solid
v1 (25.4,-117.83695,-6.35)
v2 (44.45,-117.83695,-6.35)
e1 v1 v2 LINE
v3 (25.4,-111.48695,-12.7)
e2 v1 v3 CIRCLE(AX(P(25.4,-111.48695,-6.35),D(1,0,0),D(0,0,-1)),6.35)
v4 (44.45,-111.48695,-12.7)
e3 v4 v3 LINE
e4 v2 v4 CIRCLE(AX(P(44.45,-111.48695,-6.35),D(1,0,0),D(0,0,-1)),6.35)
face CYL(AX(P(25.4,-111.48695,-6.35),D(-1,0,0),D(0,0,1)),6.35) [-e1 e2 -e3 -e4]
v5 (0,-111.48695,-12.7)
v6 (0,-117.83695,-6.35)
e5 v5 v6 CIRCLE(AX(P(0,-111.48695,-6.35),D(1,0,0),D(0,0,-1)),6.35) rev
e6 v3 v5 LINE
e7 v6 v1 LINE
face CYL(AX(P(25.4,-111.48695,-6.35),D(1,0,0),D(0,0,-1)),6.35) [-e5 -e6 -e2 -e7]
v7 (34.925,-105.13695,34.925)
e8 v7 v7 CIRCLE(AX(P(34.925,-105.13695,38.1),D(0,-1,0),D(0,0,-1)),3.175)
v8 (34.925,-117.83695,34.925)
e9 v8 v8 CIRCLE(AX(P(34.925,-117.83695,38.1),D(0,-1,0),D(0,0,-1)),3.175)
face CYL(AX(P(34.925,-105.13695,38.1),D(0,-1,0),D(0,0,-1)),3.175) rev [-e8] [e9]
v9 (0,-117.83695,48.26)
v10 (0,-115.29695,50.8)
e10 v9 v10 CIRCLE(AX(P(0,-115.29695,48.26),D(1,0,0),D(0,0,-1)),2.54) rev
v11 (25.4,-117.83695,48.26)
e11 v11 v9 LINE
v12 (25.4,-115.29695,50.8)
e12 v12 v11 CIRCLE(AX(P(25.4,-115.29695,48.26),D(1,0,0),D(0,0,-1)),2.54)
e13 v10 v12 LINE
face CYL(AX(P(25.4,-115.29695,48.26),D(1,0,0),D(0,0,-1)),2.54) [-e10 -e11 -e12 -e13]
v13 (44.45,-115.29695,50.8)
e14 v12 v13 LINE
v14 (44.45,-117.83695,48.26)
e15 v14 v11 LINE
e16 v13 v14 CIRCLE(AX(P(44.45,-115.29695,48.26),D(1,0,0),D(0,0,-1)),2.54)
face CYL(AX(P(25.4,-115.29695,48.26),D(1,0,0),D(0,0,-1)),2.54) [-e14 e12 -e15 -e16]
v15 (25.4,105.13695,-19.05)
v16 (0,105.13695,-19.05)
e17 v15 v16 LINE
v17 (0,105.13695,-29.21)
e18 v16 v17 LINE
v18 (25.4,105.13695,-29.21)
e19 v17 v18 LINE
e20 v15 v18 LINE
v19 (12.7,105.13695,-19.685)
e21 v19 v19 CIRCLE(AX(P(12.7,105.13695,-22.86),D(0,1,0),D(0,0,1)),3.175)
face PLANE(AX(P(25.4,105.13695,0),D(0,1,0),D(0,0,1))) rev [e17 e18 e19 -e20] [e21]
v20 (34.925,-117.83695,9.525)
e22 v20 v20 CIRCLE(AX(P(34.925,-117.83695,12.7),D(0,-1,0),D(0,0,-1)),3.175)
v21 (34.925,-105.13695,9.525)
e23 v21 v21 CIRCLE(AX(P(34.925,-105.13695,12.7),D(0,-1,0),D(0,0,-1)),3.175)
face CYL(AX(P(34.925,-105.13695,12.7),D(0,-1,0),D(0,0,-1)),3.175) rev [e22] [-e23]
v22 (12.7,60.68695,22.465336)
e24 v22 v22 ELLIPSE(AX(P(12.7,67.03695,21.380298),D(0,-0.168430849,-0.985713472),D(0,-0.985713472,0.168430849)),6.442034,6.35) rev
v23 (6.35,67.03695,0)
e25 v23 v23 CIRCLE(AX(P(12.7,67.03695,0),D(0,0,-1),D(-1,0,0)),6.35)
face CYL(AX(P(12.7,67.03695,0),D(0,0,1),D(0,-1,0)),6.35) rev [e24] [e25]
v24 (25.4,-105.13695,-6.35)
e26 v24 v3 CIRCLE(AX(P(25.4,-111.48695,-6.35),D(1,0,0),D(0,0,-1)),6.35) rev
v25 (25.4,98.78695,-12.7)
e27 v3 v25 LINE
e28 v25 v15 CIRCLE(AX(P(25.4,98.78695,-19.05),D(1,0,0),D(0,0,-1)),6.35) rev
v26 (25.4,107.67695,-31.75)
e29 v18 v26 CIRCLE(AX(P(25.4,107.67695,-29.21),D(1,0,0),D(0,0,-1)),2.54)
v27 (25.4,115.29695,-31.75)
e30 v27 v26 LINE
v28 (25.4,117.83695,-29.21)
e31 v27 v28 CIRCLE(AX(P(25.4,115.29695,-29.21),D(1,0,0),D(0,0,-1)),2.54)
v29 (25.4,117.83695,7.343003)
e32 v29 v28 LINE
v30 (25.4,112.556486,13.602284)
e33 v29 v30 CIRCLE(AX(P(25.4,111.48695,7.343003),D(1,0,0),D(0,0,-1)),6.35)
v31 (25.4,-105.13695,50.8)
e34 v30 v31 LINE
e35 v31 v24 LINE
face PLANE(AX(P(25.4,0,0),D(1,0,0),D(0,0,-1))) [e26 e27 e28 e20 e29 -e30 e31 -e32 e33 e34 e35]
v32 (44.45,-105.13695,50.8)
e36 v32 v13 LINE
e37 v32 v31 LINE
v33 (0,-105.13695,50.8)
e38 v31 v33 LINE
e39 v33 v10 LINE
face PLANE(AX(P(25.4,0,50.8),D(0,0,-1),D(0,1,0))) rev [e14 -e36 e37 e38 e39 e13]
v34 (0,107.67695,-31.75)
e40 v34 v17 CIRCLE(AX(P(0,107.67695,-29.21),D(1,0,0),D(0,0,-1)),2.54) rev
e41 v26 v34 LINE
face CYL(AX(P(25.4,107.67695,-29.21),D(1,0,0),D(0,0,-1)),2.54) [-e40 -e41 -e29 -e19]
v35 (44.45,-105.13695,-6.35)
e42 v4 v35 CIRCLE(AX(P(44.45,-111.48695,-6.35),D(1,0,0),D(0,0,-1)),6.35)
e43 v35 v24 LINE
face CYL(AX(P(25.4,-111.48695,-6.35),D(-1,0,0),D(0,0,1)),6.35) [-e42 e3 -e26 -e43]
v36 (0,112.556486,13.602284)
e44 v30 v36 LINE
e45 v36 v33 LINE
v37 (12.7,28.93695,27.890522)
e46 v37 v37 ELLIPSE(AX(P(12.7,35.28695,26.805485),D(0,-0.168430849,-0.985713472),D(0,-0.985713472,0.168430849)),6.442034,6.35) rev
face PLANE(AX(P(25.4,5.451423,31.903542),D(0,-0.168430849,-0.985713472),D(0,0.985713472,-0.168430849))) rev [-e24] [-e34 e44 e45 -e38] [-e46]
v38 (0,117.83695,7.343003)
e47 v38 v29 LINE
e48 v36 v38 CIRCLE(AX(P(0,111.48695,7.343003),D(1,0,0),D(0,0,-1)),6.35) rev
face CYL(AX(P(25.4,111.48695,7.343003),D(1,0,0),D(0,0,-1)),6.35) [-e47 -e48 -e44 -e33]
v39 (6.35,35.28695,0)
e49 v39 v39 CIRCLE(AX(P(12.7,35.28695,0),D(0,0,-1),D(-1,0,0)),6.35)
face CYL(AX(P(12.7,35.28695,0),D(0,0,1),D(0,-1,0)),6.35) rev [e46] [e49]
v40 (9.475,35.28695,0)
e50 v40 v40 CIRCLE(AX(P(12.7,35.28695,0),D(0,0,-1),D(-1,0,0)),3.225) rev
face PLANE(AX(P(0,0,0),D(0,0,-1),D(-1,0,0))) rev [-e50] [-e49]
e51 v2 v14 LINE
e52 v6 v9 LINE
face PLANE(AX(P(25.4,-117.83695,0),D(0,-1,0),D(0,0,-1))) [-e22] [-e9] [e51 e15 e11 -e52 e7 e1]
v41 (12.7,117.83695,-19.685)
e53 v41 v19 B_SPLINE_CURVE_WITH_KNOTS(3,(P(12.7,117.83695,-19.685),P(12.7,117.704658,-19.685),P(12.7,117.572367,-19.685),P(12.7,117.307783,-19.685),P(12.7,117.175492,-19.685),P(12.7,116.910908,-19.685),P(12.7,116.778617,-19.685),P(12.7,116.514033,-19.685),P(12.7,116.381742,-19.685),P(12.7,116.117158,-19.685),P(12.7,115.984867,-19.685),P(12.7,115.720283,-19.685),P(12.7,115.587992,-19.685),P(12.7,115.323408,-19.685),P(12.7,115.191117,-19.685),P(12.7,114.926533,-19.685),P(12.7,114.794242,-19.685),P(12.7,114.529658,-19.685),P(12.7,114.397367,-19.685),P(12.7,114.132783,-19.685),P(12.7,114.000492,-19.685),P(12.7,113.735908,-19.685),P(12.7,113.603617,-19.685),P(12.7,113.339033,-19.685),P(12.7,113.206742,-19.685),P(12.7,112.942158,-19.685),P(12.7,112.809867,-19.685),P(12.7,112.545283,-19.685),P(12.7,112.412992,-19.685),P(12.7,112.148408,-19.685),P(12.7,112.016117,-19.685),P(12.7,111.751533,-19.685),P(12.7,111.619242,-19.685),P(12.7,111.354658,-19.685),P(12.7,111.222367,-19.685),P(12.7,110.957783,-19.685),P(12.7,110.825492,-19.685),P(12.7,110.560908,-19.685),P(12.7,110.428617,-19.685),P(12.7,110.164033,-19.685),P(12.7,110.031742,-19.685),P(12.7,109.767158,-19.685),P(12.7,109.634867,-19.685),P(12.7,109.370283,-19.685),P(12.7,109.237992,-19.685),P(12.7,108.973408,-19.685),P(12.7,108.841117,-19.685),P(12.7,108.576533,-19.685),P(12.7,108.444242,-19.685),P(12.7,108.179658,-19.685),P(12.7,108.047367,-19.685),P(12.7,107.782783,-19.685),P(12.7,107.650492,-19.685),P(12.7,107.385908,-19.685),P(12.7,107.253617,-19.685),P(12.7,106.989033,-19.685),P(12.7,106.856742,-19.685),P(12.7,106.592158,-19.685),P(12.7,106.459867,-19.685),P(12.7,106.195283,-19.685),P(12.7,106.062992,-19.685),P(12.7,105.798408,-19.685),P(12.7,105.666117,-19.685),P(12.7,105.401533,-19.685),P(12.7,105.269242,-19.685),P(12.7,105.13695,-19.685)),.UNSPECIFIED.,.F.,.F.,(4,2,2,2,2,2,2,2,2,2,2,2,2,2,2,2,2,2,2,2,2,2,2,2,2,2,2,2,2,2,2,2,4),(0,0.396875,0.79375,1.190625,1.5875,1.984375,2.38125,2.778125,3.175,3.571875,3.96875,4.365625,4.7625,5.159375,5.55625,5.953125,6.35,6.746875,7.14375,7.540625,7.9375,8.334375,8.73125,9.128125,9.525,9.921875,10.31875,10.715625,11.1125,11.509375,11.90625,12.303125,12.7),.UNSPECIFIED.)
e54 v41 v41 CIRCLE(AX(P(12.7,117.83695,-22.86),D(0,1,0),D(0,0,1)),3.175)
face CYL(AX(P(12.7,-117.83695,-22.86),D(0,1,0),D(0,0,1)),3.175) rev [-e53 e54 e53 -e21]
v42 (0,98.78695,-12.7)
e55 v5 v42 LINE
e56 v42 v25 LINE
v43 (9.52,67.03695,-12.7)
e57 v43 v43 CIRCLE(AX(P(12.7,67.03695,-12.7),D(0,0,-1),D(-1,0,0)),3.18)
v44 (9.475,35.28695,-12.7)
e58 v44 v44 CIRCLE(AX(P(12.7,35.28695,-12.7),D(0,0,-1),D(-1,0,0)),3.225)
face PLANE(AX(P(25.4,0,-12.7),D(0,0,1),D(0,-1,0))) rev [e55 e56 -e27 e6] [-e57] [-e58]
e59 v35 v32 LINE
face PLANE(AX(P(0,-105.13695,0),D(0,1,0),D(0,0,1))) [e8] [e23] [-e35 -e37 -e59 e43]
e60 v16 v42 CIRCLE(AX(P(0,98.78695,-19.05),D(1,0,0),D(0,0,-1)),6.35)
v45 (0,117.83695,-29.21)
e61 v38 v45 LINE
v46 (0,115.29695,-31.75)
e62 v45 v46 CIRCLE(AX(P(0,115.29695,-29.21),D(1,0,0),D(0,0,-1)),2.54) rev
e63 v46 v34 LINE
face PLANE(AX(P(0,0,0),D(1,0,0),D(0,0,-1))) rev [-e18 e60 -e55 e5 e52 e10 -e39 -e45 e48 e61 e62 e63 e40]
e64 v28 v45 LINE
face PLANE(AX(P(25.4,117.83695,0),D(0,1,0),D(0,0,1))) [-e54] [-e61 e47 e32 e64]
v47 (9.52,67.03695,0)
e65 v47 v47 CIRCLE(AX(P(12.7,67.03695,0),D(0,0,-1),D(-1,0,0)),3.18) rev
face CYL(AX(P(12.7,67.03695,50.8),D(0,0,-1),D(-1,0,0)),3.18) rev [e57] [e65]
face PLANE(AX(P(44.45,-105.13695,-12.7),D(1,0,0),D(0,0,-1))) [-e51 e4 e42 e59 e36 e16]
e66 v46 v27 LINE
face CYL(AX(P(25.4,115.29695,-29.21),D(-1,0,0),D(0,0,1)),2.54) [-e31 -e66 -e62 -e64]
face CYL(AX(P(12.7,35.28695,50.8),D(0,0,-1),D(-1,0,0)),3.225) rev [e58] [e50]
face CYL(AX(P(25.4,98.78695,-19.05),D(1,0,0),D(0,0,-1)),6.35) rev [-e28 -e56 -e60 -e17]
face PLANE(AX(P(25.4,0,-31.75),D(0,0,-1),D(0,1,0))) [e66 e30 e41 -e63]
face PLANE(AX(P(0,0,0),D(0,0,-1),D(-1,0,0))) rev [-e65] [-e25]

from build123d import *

# Parameters (mm, degrees)
SKETCH3_W           = 38.1
SKETCH3_H           = 12.7
SKETCH3_W_2         = 19.05
BOSS_EXTRUDE1_DEPTH = 25.4
FILLET1_R           = 6.35
FILLET3_R           = 2.54
SKETCH9_R           = 3.175
CUT_EXTRUDE2_DEPTH  = 243.42109467
SKETCH10_R          = 3.225000027
SKETCH10_R_2        = 3.180000003
CUT_EXTRUDE3_DEPTH  = 137.245942271
SKETCH18_R          = 6.35
CUT_EXTRUDE4_DEPTH  = 38.1
SKETCH19_W          = 19.05
SKETCH19_H          = 63.5
SKETCH19_R          = 3.175
BOSS_EXTRUDE4_DEPTH = 12.7
FILLET6_R           = 2.54
FILLET7_R           = 6.35


with BuildPart() as part:
    # Sketch3 → Boss-Extrude1 (new body)
    with BuildSketch(Plane(origin=(0, 0, 0), x_dir=(0, 0, -1), z_dir=(1, 0, 0))):
        Polygon((-12.7, -105.13695), (-12.7, -117.83695), (12.7, -117.83695), (12.7, 105.13695), (12.7, 117.83695), (-12.7, 117.83695), (-50.8, -105.13695), align=None)
        with Locations((-31.75, -111.48695)):
            Rectangle(SKETCH3_W, SKETCH3_H)
        with Locations((22.225, 111.48695)):
            Rectangle(SKETCH3_W_2, SKETCH3_H)
    extrude(amount=BOSS_EXTRUDE1_DEPTH)

    # Fillet1
    fillet1_edges = [part.edges().sort_by_distance(p)[0] for p in [
        (12.7, 105.13695, -12.7),
        (12.7, -117.83695, -12.7),
        (12.7, 117.83695, 12.7),
    ]]
    fillet(fillet1_edges, radius=FILLET1_R)

    # Fillet3
    fillet3_edges = [part.edges().sort_by_distance(p)[0] for p in [
        (12.7, 117.83695, -31.75),
        (12.7, 105.13695, -31.75),
        (12.7, -117.83695, 50.8),
    ]]
    fillet(fillet3_edges, radius=FILLET3_R)

    # Sketch9 → Cut-Extrude2 (cut, through all)
    with BuildSketch(Plane(origin=(0, 117.83695, 0), x_dir=(1, 0, 0), z_dir=(0, 1, 0))):
        with Locations(Location((12.7, 22.86, 0), (0, 0, 270))):
            Circle(SKETCH9_R)
    extrude(amount=-CUT_EXTRUDE2_DEPTH, mode=Mode.SUBTRACT)

    # Sketch10 → Cut-Extrude3 (cut, through all)
    with BuildSketch(Plane(origin=(0, 0, -12.7), x_dir=(-1, 0, 0), z_dir=(0, 0, -1))):
        with Locations((-12.7, 35.28695)):
            Circle(SKETCH10_R)
        with Locations((-12.7, 67.03695)):
            Circle(SKETCH10_R_2)
    extrude(amount=-CUT_EXTRUDE3_DEPTH, mode=Mode.SUBTRACT)

    # Sketch18 → Cut-Extrude4 (cut)
    with BuildSketch(Plane(origin=(0, 0, 38.1), x_dir=(-1, 0, 0), z_dir=(0, 0, -1))):
        with Locations(Location((-12.7, 67.03695, 0), (0, 0, 270))):
            Circle(SKETCH18_R)
        with Locations(Location((-12.7, 35.28695, 0), (0, 0, 270))):
            Circle(SKETCH18_R)
    extrude(amount=CUT_EXTRUDE4_DEPTH, mode=Mode.SUBTRACT)

    # Sketch19 → Boss-Extrude4 (add)
    with BuildSketch(Plane.XZ.offset(117.83695)):
        with Locations((34.925, 19.05)):
            Rectangle(SKETCH19_W, SKETCH19_H)
        with Locations(Location((34.925, 38.1, 0), (0, 0, 270))):
            Circle(SKETCH19_R, mode=Mode.SUBTRACT)
        with Locations(Location((34.925, 12.7, 0), (0, 0, 270))):
            Circle(SKETCH19_R, mode=Mode.SUBTRACT)
    extrude(amount=-BOSS_EXTRUDE4_DEPTH)

    # Fillet6
    fillet6_edges = [part.edges().sort_by_distance(p)[0] for p in [
        (34.925, -117.83695, 50.8),
    ]]
    fillet(fillet6_edges, radius=FILLET6_R)

    # Fillet7
    # the kernel refuses this fillet: 6.35 mm, written as the material it takes off along each edge
    with BuildSketch(Plane(origin=(9.525, -117.83695, -12.7), x_dir=(0, 0, 1), z_dir=(1, 0, 0))) as fillet7_piece_1:
        with BuildLine():
            CenterArc((FILLET7_R, -FILLET7_R), FILLET7_R, 90, 90)
            Line((0, -FILLET7_R), (0, 0))
            Line((0, 0), (FILLET7_R, 0))
        make_face()
    extrude(amount=50.8, mode=Mode.SUBTRACT)
    with BuildSketch(Plane(origin=(25.4, -105.13695, -12.7), x_dir=(0, 0, 1), z_dir=(1, 0, 0))) as fillet7_piece_2:
        with BuildLine():
            CenterArc((FILLET7_R, FILLET7_R), FILLET7_R, 180, 90)
            Line((0, FILLET7_R), (0, 0))
            Line((0, 0), (FILLET7_R, 0))
        make_face()
    extrude(amount=34.925, mode=Mode.SUBTRACT)


solid = part.part
